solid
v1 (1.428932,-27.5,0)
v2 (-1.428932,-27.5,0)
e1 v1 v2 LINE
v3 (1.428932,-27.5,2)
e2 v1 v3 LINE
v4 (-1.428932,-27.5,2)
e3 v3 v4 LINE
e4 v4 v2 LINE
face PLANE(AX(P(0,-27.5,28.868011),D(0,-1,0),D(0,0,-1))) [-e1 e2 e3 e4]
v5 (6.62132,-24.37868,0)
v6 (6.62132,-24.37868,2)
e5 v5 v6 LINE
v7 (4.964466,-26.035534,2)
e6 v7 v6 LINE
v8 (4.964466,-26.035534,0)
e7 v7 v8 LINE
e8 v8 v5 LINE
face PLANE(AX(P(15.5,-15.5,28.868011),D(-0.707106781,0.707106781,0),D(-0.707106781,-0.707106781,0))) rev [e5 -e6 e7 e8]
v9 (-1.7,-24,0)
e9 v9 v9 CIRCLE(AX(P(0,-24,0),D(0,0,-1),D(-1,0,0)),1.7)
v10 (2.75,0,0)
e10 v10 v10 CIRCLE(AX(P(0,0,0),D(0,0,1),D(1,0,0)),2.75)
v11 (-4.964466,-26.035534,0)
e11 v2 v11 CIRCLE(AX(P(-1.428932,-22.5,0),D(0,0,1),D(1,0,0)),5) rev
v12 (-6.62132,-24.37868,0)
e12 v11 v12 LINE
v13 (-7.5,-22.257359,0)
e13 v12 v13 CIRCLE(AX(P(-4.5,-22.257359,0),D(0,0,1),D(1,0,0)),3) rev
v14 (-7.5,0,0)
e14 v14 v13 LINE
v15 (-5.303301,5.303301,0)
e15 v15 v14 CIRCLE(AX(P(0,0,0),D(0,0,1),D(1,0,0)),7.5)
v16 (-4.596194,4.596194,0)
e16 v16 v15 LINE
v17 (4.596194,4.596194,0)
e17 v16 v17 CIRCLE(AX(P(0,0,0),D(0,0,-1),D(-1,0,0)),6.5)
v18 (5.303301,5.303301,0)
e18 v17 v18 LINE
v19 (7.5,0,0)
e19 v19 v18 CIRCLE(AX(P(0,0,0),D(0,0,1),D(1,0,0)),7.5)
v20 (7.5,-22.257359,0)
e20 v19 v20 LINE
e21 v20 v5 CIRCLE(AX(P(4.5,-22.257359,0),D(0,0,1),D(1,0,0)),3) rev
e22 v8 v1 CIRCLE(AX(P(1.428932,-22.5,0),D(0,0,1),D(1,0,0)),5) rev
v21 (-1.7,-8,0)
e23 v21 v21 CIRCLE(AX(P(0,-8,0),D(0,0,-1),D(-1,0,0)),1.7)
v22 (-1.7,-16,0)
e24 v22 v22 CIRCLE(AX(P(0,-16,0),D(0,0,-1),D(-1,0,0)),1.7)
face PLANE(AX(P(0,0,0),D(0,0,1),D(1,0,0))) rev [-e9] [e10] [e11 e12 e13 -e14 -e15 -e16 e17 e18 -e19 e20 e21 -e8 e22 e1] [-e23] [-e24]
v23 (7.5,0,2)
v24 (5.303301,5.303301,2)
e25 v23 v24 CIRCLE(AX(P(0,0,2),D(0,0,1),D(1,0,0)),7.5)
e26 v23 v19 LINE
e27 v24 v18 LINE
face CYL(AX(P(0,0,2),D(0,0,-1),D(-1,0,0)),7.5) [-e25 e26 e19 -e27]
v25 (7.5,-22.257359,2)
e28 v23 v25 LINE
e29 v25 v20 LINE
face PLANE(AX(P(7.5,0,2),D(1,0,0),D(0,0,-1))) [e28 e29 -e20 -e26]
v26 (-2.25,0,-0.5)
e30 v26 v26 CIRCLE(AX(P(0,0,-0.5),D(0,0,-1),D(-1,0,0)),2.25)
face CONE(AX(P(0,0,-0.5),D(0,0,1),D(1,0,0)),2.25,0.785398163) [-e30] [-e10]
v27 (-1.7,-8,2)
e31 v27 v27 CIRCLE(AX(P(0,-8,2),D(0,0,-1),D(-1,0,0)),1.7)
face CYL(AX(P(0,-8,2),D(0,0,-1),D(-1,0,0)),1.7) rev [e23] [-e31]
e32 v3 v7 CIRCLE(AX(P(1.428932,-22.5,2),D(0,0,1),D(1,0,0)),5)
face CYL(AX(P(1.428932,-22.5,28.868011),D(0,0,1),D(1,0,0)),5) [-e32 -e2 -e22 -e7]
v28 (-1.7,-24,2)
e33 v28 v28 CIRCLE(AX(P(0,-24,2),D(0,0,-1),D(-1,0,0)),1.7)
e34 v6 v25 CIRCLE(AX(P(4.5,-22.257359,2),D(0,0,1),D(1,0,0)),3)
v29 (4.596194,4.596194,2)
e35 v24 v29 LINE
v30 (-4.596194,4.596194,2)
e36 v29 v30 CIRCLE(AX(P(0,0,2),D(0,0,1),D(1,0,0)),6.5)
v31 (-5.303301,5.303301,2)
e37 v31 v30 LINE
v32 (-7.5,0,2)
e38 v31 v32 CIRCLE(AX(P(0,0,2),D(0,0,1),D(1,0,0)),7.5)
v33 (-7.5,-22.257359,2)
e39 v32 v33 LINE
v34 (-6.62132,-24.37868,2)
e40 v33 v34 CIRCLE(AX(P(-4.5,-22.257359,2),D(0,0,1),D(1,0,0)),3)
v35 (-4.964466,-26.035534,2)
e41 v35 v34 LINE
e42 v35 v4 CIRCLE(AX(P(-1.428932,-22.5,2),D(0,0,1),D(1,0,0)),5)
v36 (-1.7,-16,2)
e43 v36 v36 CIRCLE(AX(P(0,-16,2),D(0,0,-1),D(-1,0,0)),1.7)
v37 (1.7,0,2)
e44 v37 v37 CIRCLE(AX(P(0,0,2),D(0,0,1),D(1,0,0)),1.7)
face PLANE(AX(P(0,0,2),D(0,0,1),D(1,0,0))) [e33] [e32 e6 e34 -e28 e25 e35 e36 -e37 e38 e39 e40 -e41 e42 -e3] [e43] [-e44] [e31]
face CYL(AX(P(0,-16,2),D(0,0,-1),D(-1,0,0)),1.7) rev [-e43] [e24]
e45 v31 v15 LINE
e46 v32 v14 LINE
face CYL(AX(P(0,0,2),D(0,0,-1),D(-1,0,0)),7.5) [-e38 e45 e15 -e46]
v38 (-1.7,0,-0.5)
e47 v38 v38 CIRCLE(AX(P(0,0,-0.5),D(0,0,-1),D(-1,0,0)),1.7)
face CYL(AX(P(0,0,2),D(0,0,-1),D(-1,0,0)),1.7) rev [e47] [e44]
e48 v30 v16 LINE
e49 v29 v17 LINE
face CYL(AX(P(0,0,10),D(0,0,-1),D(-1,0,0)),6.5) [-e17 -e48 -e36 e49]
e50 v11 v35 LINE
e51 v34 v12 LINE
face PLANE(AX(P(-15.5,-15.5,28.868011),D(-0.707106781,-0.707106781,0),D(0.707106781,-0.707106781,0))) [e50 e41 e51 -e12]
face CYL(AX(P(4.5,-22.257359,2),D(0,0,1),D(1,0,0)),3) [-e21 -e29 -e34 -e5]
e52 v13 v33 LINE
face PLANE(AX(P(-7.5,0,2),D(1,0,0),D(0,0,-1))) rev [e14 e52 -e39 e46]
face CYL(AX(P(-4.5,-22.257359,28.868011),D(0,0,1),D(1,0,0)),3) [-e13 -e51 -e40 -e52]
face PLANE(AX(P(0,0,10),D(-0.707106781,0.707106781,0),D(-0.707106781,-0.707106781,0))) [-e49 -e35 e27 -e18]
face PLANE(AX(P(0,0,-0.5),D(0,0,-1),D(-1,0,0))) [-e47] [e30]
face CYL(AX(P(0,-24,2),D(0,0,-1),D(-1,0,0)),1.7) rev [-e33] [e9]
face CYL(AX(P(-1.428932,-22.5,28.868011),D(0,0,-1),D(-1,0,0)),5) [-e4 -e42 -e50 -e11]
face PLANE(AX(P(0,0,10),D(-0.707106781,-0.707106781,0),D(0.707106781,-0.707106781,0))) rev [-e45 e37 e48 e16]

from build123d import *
from build123d.topology import SkipClean

# Parameters (mm, degrees)
SKETCH1_R                 = 1.7
BOSS_EXTRUDE1_DEPTH       = 2
BOSS_EXTRUDE2_START       = -4.3
BOSS_EXTRUDE2_DEPTH       = 4.3
BOSS_EXTRUDE3_START       = 2
BOSS_EXTRUDE3_DEPTH       = 2
SKETCH3_R                 = 1.7
CUT_EXTRUDE2_DEPTH        = 2
FILLET1_R                 = 0.5
FILLET2_R                 = 0.5
FILLET3_R                 = 1.5
FILLET4_R                 = 0.5
SKETCH5_R                 = 15.029475961
CUT_EXTRUDE3_DEPTH        = 10
CUT_EXTRUDE4_DEPTH        = 10
BOSS_EXTRUDE4_START       = 0.5
SKETCH7_R                 = 2.25
SKETCH7_R_2               = 1.7
BOSS_EXTRUDE4_DEPTH       = 0.5
CHAMFER2_SIZE             = 0.5
CUT_EXTRUDE7_DEPTH        = 31.987900865
BOSS_EXTRUDE5_DEPTH       = 2
FILLET7_R                 = 5
FILLET8_R                 = 1
FILLET9_R                 = 3
BOSS_EXTRUDE6_START       = -2
BOSS_EXTRUDE6_OUTLINE_R   = 1.7
BOSS_EXTRUDE6_OUTLINE_R_2 = 2.75
BOSS_EXTRUDE6_DEPTH       = 2


with BuildPart() as part:
    # Sketch1 → Boss-Extrude1 (new body)
    with BuildSketch(Plane.XY):
        with BuildLine():
            Line((-7.5, 0), (-7.5, -30))
            Line((-7.5, -30), (7.5, -30))
            Line((7.5, -30), (7.5, 0))
            ThreePointArc((7.5, 0), (0, 7.5), (-7.5, 0))
        make_face()
        Circle(SKETCH1_R, mode=Mode.SUBTRACT)
    extrude(amount=BOSS_EXTRUDE1_DEPTH)

    # Sketch1<3> → Boss-Extrude2 (add)
    with BuildSketch(Plane.XY.offset(BOSS_EXTRUDE2_START)):
        with BuildLine():
            ThreePointArc((5.303300859, 5.303300859), (0, 7.5), (-5.303300859, 5.303300859))
            Line((-5.303300859, 5.303300859), (-4.419417382, 4.419417382))
            ThreePointArc((-4.419417382, 4.419417382), (0, 6.25), (4.419417382, 4.419417382))
            Line((4.419417382, 4.419417382), (5.303300859, 5.303300859))
        make_face()
    extrude(amount=BOSS_EXTRUDE2_DEPTH)

    # Sketch2 → Boss-Extrude3 (add)
    with BuildSketch(Plane(origin=(0, 0, -4.3), x_dir=(-1, 0, 0), z_dir=(0, 0, -1)).offset(BOSS_EXTRUDE3_START)):
        with BuildLine():
            ThreePointArc((-0.842733725, 2.879201255), (-2.631805464, 1.44), (-2.879201255, -0.842733725))
            ThreePointArc((-2.879201255, -0.842733725), (0, -3), (2.879201255, -0.842733725))
            ThreePointArc((2.879201255, -0.842733725), (2.969646761, -0.425673721), (3, 0))
            ThreePointArc((3, 0), (2.400854137, 1.798860587), (0.842733725, 2.879201255))
            Line((0.842733725, 2.879201255), (0.477549111, 1.631547378))
            ThreePointArc((0.477549111, 1.631547378), (1.360484011, 1.019354333), (1.7, 0))
            ThreePointArc((1.7, 0), (-1.019354333, -1.360484011), (-0.477549111, 1.631547378))
            Line((-0.477549111, 1.631547378), (-0.842733725, 2.879201255))
        make_face()
        with BuildLine():
            ThreePointArc((0.842733725, 2.879201255), (0, 3), (-0.842733725, 2.879201255))
            Line((-0.842733725, 2.879201255), (-0.477549111, 1.631547378))
            ThreePointArc((-0.477549111, 1.631547378), (0, 1.7), (0.477549111, 1.631547378))
            Line((0.477549111, 1.631547378), (0.842733725, 2.879201255))
        make_face()
        with BuildLine():
            ThreePointArc((-1.755695261, 5.998335948), (-3.186887196, 5.376453292), (-4.419417382, 4.419417382))
            Line((-4.419417382, 4.419417382), (-2.879201255, -0.842733725))
            ThreePointArc((-2.879201255, -0.842733725), (-2.631805464, 1.44), (-0.842733725, 2.879201255))
            Line((-0.842733725, 2.879201255), (-1.755695261, 5.998335948))
        make_face()
        with BuildLine():
            ThreePointArc((3, 0), (2.969646761, -0.425673721), (2.879201255, -0.842733725))
            Line((2.879201255, -0.842733725), (4.419417382, 4.419417382))
            ThreePointArc((4.419417382, 4.419417382), (3.186887196, 5.376453292), (1.755695261, 5.998335948))
            Line((1.755695261, 5.998335948), (0.842733725, 2.879201255))
            ThreePointArc((0.842733725, 2.879201255), (2.400854137, 1.798860587), (3, 0))
        make_face()
        with BuildLine():
            Line((-5.303300859, 5.303300859), (-4.419417382, 4.419417382))
            ThreePointArc((-4.419417382, 4.419417382), (-3.186887196, 5.376453292), (-1.755695261, 5.998335948))
            ThreePointArc((-1.755695261, 5.998335948), (0, 6.25), (1.755695261, 5.998335948))
            ThreePointArc((1.755695261, 5.998335948), (3.186887196, 5.376453292), (4.419417382, 4.419417382))
            Line((4.419417382, 4.419417382), (5.303300859, 5.303300859))
            ThreePointArc((5.303300859, 5.303300859), (0, 7.5), (-5.303300859, 5.303300859))
        make_face()
    extrude(amount=-BOSS_EXTRUDE3_DEPTH)

    # Sketch3 → Cut-Extrude2 (cut)
    with BuildSketch(Plane(origin=(0, 0, 0), x_dir=(-1, 0, 0), z_dir=(0, 0, -1))):
        with Locations((0, -8)):
            Circle(SKETCH3_R)
        with Locations((0, -16)):
            Circle(SKETCH3_R)
        with Locations((0, -24)):
            Circle(SKETCH3_R)
        Polygon((-6, -18.5), (-3.1875, -20), (-6, -21.5), align=None)
        Polygon((-6, -10.5), (-3.1875, -12), (-6, -13.5), align=None)
        Polygon((6, -13.5), (3.1875, -12), (6, -10.5), align=None)
        Polygon((6, -21.5), (3.1875, -20), (6, -18.5), align=None)
    extrude(amount=-CUT_EXTRUDE2_DEPTH, mode=Mode.SUBTRACT)

    # Fillet1
    fillet1_edges = [part.edges().sort_by_distance(p)[0] for p in [
        (-3.1875, -20, 1),
        (-6, -18.5, 1),
        (6, -18.5, 1),
        (3.1875, -20, 1),
        (6, -21.5, 1),
        (6, -10.5, 1),
        (3.1875, -12, 1),
        (6, -13.5, 1),
        (-6, -13.5, 1),
        (-3.1875, -12, 1),
        (-6, -10.5, 1),
        (-6, -21.5, 1),
    ]]
    fillet(fillet1_edges, radius=FILLET1_R)

    # Fillet2
    fillet2_edges = [part.edges().sort_by_distance(p)[0] for p in [
        (5.303300859, 5.303300859, -3.15),
        (4.419417382, 4.419417382, -2.15),
        (-4.419417382, 4.419417382, -2.15),
        (-5.303300859, 5.303300859, -3.15),
    ]]
    fillet(fillet2_edges, radius=FILLET2_R)

    # Fillet3
    fillet3_edges = [part.edges().sort_by_distance(p)[0] for p in [
        (-4.419417382, 4.419417382, -5.3),
        (4.419417382, 4.419417382, -5.3),
    ]]
    fillet(fillet3_edges, radius=FILLET3_R)

    # Fillet4
    fillet4_edges = [part.edges().sort_by_distance(p)[0] for p in [
        (-0.842733725, 2.879201255, -5.3),
        (0.842733725, 2.879201255, -5.3),
        (1.755695261, 5.998335948, -5.3),
        (-1.755695261, 5.998335948, -5.3),
    ]]
    fillet(fillet4_edges, radius=FILLET4_R)

    # Sketch5 → Cut-Extrude3 (cut)
    with BuildSketch(Plane(origin=(0, 0, 0), x_dir=(-1, 0, 0), z_dir=(0, 0, -1))):
        Circle(SKETCH5_R)
    extrude(amount=CUT_EXTRUDE3_DEPTH, mode=Mode.SUBTRACT)

    # Sketch6 → Cut-Extrude4 (cut)
    with BuildSketch(Plane(origin=(0, 0, 0), x_dir=(-1, 0, 0), z_dir=(0, 0, -1))):
        with BuildLine():
            Line((-5.303300859, 5.303300859), (-4.596194078, 4.596194078))
            ThreePointArc((-4.596194078, 4.596194078), (0, 6.5), (4.596194078, 4.596194078))
            Line((4.596194078, 4.596194078), (5.303300859, 5.303300859))
            ThreePointArc((5.303300859, 5.303300859), (0, 7.5), (-5.303300859, 5.303300859))
        make_face()
    extrude(amount=-CUT_EXTRUDE4_DEPTH, mode=Mode.SUBTRACT)

    # Sketch7 → Boss-Extrude4 (add)
    with SkipClean():  # the faces are left unmerged after this step: merging them gives an invalid solid
        with BuildSketch(Plane(origin=(0, 0, 0), x_dir=(-1, 0, 0), z_dir=(0, 0, -1)).offset(BOSS_EXTRUDE4_START)):
            with Locations(Location((0, 0, 0), (0, 0, 180))):
                Circle(SKETCH7_R)
            Circle(SKETCH7_R_2, mode=Mode.SUBTRACT)
        extrude(amount=-BOSS_EXTRUDE4_DEPTH)

    # Chamfer2
    chamfer2_edges = [part.edges().sort_by_distance(p)[0] for p in [
        (-2.25, 0, 0),
    ]]
    chamfer(chamfer2_edges, length=CHAMFER2_SIZE - 0.0001)  # a hair under: the kernel refuses the full size

    # Sketch4 → Cut-Extrude7 (cut, through all)
    # profile 1 of 3: a face of its own
    with BuildSketch(Plane(origin=(0, 0, 0), x_dir=(-1, 0, 0), z_dir=(0, 0, -1))):
        with BuildLine():
            Line((-4.014705882, -20.441176471), (-3.5, -20.166666667))
            Line((-3.5, -20.166666667), (-3.5, -11.833333333))
            Line((-3.5, -11.833333333), (-3.5, -5.7))
            Line((-3.5, -5.7), (-7.5, -1.7))
            Line((-7.5, -1.7), (-7.5, -22.3))
            Line((-7.5, -22.3), (-5.264705882, -21.107843137))
            ThreePointArc((-5.264705882, -21.107843137), (-5.757247878, -21.09541313), (-6, -20.666666667))
            Line((-6, -20.666666667), (-6, -19.333333333))
            ThreePointArc((-6, -19.333333333), (-5.757247878, -18.90458687), (-5.264705882, -18.892156863))
            Line((-5.264705882, -18.892156863), (-4.014705882, -19.558823529))
            ThreePointArc((-4.014705882, -19.558823529), (-3.75, -20), (-4.014705882, -20.441176471))
        make_face()
        with BuildLine():
            ThreePointArc((-5.264705882, -13.107843137), (-5.757247878, -13.09541313), (-6, -12.666666667))
            Line((-6, -12.666666667), (-6, -11.333333333))
            ThreePointArc((-6, -11.333333333), (-5.757247878, -10.90458687), (-5.264705882, -10.892156863))
            Line((-5.264705882, -10.892156863), (-4.014705882, -11.558823529))
            ThreePointArc((-4.014705882, -11.558823529), (-3.75, -12), (-4.014705882, -12.441176471))
            Line((-4.014705882, -12.441176471), (-5.264705882, -13.107843137))
        make_face(mode=Mode.SUBTRACT)
    # profile 2 of 3: a face of its own
    with BuildSketch(Plane(origin=(0, 0, 0), x_dir=(-1, 0, 0), z_dir=(0, 0, -1))):
        with BuildLine():
            Line((-3.5, -24), (-3.5, -20.166666667))
            Line((-3.5, -20.166666667), (-4.014705882, -20.441176471))
            Line((-4.014705882, -20.441176471), (-5.264705882, -21.107843137))
            Line((-5.264705882, -21.107843137), (-7.5, -22.3))
            Line((-7.5, -22.3), (-7.5, -30))
            Line((-7.5, -30), (7.5, -30))
            Line((7.5, -30), (7.5, -22.3))
            Line((7.5, -22.3), (5.264705882, -21.107843137))
            Line((5.264705882, -21.107843137), (4.014705882, -20.441176471))
            Line((4.014705882, -20.441176471), (3.5, -20.166666667))
            Line((3.5, -20.166666667), (3.5, -24))
            ThreePointArc((3.5, -24), (0, -27.5), (-3.5, -24))
        make_face()
    # profile 3 of 3: a face of its own
    with BuildSketch(Plane(origin=(0, 0, 0), x_dir=(-1, 0, 0), z_dir=(0, 0, -1))):
        with BuildLine():
            Line((3.5, -11.833333333), (3.5, -20.166666667))
            Line((3.5, -20.166666667), (4.014705882, -20.441176471))
            ThreePointArc((4.014705882, -20.441176471), (3.75, -20), (4.014705882, -19.558823529))
            Line((4.014705882, -19.558823529), (5.264705882, -18.892156863))
            ThreePointArc((5.264705882, -18.892156863), (5.757247878, -18.90458687), (6, -19.333333333))
            Line((6, -19.333333333), (6, -20.666666667))
            ThreePointArc((6, -20.666666667), (5.757247878, -21.09541313), (5.264705882, -21.107843137))
            Line((5.264705882, -21.107843137), (7.5, -22.3))
            Line((7.5, -22.3), (7.5, -1.7))
            Line((7.5, -1.7), (3.5, -5.7))
            Line((3.5, -5.7), (3.5, -11.833333333))
        make_face()
        with BuildLine():
            ThreePointArc((5.264705882, -10.892156863), (5.757247878, -10.90458687), (6, -11.333333333))
            Line((6, -11.333333333), (6, -12.666666667))
            ThreePointArc((6, -12.666666667), (5.757247878, -13.09541313), (5.264705882, -13.107843137))
            Line((5.264705882, -13.107843137), (4.014705882, -12.441176471))
            ThreePointArc((4.014705882, -12.441176471), (3.75, -12), (4.014705882, -11.558823529))
            Line((4.014705882, -11.558823529), (5.264705882, -10.892156863))
        make_face(mode=Mode.SUBTRACT)
    extrude(amount=-CUT_EXTRUDE7_DEPTH, mode=Mode.SUBTRACT)

    # Sketch9 → Boss-Extrude5 (add)
    # profile 1 of 2: a face of its own
    with BuildSketch(Plane(origin=(0, 0, 0), x_dir=(-1, 0, 0), z_dir=(0, 0, -1))):
        with BuildLine():
            Line((-3.5, -5.7), (-7.5, -1.7))
            Line((-7.5, -1.7), (-7.5, -23.5))
            Line((-7.5, -23.5), (-3.5, -27.5))
            Line((-3.5, -27.5), (0, -27.5))
            ThreePointArc((0, -27.5), (-2.474873734, -26.474873734), (-3.5, -24))
            Line((-3.5, -24), (-3.5, -5.7))
        make_face()
        Polygon((-4.5, -6.114213562), (-4.5, -25.085786438), (-6.5, -23.085786438), (-6.5, -4.114213562), align=None, mode=Mode.SUBTRACT)
    # profile 2 of 2: a face of its own
    with BuildSketch(Plane(origin=(0, 0, 0), x_dir=(-1, 0, 0), z_dir=(0, 0, -1))):
        with BuildLine():
            ThreePointArc((3.5, -24), (2.474873734, -26.474873734), (0, -27.5))
            Line((0, -27.5), (3.5, -27.5))
            Line((3.5, -27.5), (7.5, -23.5))
            Line((7.5, -23.5), (7.5, -1.7))
            Line((7.5, -1.7), (3.5, -5.7))
            Line((3.5, -5.7), (3.5, -24))
        make_face()
        Polygon((4.5, -6.114213562), (6.5, -4.114213562), (6.5, -23.085786438), (4.5, -25.085786438), align=None, mode=Mode.SUBTRACT)
    extrude(amount=-BOSS_EXTRUDE5_DEPTH)

    # Fillet7
    fillet7_edges = [part.edges().sort_by_distance(p)[0] for p in [
        (-3.5, -27.5, 1),
        (3.5, -27.5, 1),
    ]]
    fillet(fillet7_edges, radius=FILLET7_R)

    # Fillet8
    fillet8_edges = [part.edges().sort_by_distance(p)[0] for p in [
        (4.5, -25.085786438, 1),
        (6.5, -23.085786438, 1),
        (6.5, -4.114213562, 1),
        (4.5, -6.114213562, 1),
        (-4.5, -6.114213562, 1),
        (-6.5, -4.114213562, 1),
        (-6.5, -23.085786438, 1),
        (-4.5, -25.085786438, 1),
    ]]
    fillet(fillet8_edges, radius=FILLET8_R - 0.0001)  # a hair under: the kernel refuses the full size

    # Fillet9
    fillet9_edges = [part.edges().sort_by_distance(p)[0] for p in [
        (-7.5, -23.5, 1),
        (7.5, -23.5, 1),
    ]]
    fillet(fillet9_edges, radius=FILLET9_R)

    # Boss-Extrude6: read off the stored shape, not the designer's step
    # Boss-Extrude6 outline → Boss-Extrude6 (add)
    with BuildSketch(Plane(origin=(0, 0, 0), x_dir=(-1, 0, 0), z_dir=(0, 0, -1)).offset(BOSS_EXTRUDE6_START)):
        with BuildLine():
            ThreePointArc((1.428932188, -27.5), (3.34234935, -27.119397663), (4.964466094, -26.035533906))
            Line((4.964466094, -26.035533906), (6.621320344, -24.378679656))
            ThreePointArc((6.621320344, -24.378679656), (7.271638598, -23.40540961), (7.5, -22.257359313))
            Line((7.5, -22.257359313), (7.5, 0))
            ThreePointArc((7.5, 0), (6.929096494, 2.870125743), (5.303300859, 5.303300859))
            Line((5.303300859, 5.303300859), (4.596194078, 4.596194078))
            ThreePointArc((4.596194078, 4.596194078), (0, 6.5), (-4.596194078, 4.596194078))
            Line((-4.596194078, 4.596194078), (-5.303300859, 5.303300859))
            ThreePointArc((-5.303300859, 5.303300859), (-6.929096494, 2.870125743), (-7.5, 0))
            Line((-7.5, 0), (-7.5, -22.257359313))
            ThreePointArc((-7.5, -22.257359313), (-7.271638598, -23.40540961), (-6.621320344, -24.378679656))
            Line((-6.621320344, -24.378679656), (-4.964466094, -26.035533906))
            ThreePointArc((-4.964466094, -26.035533906), (-3.34234935, -27.119397663), (-1.428932188, -27.5))
            Line((-1.428932188, -27.5), (1.428932188, -27.5))
        make_face()
        with Locations((0, -24)):
            Circle(BOSS_EXTRUDE6_OUTLINE_R, mode=Mode.SUBTRACT)
        with Locations((0, -16)):
            Circle(BOSS_EXTRUDE6_OUTLINE_R, mode=Mode.SUBTRACT)
        with Locations((0, -8)):
            Circle(BOSS_EXTRUDE6_OUTLINE_R, mode=Mode.SUBTRACT)
        Circle(BOSS_EXTRUDE6_OUTLINE_R_2, mode=Mode.SUBTRACT)
    extrude(amount=BOSS_EXTRUDE6_DEPTH)


solid = part.part
